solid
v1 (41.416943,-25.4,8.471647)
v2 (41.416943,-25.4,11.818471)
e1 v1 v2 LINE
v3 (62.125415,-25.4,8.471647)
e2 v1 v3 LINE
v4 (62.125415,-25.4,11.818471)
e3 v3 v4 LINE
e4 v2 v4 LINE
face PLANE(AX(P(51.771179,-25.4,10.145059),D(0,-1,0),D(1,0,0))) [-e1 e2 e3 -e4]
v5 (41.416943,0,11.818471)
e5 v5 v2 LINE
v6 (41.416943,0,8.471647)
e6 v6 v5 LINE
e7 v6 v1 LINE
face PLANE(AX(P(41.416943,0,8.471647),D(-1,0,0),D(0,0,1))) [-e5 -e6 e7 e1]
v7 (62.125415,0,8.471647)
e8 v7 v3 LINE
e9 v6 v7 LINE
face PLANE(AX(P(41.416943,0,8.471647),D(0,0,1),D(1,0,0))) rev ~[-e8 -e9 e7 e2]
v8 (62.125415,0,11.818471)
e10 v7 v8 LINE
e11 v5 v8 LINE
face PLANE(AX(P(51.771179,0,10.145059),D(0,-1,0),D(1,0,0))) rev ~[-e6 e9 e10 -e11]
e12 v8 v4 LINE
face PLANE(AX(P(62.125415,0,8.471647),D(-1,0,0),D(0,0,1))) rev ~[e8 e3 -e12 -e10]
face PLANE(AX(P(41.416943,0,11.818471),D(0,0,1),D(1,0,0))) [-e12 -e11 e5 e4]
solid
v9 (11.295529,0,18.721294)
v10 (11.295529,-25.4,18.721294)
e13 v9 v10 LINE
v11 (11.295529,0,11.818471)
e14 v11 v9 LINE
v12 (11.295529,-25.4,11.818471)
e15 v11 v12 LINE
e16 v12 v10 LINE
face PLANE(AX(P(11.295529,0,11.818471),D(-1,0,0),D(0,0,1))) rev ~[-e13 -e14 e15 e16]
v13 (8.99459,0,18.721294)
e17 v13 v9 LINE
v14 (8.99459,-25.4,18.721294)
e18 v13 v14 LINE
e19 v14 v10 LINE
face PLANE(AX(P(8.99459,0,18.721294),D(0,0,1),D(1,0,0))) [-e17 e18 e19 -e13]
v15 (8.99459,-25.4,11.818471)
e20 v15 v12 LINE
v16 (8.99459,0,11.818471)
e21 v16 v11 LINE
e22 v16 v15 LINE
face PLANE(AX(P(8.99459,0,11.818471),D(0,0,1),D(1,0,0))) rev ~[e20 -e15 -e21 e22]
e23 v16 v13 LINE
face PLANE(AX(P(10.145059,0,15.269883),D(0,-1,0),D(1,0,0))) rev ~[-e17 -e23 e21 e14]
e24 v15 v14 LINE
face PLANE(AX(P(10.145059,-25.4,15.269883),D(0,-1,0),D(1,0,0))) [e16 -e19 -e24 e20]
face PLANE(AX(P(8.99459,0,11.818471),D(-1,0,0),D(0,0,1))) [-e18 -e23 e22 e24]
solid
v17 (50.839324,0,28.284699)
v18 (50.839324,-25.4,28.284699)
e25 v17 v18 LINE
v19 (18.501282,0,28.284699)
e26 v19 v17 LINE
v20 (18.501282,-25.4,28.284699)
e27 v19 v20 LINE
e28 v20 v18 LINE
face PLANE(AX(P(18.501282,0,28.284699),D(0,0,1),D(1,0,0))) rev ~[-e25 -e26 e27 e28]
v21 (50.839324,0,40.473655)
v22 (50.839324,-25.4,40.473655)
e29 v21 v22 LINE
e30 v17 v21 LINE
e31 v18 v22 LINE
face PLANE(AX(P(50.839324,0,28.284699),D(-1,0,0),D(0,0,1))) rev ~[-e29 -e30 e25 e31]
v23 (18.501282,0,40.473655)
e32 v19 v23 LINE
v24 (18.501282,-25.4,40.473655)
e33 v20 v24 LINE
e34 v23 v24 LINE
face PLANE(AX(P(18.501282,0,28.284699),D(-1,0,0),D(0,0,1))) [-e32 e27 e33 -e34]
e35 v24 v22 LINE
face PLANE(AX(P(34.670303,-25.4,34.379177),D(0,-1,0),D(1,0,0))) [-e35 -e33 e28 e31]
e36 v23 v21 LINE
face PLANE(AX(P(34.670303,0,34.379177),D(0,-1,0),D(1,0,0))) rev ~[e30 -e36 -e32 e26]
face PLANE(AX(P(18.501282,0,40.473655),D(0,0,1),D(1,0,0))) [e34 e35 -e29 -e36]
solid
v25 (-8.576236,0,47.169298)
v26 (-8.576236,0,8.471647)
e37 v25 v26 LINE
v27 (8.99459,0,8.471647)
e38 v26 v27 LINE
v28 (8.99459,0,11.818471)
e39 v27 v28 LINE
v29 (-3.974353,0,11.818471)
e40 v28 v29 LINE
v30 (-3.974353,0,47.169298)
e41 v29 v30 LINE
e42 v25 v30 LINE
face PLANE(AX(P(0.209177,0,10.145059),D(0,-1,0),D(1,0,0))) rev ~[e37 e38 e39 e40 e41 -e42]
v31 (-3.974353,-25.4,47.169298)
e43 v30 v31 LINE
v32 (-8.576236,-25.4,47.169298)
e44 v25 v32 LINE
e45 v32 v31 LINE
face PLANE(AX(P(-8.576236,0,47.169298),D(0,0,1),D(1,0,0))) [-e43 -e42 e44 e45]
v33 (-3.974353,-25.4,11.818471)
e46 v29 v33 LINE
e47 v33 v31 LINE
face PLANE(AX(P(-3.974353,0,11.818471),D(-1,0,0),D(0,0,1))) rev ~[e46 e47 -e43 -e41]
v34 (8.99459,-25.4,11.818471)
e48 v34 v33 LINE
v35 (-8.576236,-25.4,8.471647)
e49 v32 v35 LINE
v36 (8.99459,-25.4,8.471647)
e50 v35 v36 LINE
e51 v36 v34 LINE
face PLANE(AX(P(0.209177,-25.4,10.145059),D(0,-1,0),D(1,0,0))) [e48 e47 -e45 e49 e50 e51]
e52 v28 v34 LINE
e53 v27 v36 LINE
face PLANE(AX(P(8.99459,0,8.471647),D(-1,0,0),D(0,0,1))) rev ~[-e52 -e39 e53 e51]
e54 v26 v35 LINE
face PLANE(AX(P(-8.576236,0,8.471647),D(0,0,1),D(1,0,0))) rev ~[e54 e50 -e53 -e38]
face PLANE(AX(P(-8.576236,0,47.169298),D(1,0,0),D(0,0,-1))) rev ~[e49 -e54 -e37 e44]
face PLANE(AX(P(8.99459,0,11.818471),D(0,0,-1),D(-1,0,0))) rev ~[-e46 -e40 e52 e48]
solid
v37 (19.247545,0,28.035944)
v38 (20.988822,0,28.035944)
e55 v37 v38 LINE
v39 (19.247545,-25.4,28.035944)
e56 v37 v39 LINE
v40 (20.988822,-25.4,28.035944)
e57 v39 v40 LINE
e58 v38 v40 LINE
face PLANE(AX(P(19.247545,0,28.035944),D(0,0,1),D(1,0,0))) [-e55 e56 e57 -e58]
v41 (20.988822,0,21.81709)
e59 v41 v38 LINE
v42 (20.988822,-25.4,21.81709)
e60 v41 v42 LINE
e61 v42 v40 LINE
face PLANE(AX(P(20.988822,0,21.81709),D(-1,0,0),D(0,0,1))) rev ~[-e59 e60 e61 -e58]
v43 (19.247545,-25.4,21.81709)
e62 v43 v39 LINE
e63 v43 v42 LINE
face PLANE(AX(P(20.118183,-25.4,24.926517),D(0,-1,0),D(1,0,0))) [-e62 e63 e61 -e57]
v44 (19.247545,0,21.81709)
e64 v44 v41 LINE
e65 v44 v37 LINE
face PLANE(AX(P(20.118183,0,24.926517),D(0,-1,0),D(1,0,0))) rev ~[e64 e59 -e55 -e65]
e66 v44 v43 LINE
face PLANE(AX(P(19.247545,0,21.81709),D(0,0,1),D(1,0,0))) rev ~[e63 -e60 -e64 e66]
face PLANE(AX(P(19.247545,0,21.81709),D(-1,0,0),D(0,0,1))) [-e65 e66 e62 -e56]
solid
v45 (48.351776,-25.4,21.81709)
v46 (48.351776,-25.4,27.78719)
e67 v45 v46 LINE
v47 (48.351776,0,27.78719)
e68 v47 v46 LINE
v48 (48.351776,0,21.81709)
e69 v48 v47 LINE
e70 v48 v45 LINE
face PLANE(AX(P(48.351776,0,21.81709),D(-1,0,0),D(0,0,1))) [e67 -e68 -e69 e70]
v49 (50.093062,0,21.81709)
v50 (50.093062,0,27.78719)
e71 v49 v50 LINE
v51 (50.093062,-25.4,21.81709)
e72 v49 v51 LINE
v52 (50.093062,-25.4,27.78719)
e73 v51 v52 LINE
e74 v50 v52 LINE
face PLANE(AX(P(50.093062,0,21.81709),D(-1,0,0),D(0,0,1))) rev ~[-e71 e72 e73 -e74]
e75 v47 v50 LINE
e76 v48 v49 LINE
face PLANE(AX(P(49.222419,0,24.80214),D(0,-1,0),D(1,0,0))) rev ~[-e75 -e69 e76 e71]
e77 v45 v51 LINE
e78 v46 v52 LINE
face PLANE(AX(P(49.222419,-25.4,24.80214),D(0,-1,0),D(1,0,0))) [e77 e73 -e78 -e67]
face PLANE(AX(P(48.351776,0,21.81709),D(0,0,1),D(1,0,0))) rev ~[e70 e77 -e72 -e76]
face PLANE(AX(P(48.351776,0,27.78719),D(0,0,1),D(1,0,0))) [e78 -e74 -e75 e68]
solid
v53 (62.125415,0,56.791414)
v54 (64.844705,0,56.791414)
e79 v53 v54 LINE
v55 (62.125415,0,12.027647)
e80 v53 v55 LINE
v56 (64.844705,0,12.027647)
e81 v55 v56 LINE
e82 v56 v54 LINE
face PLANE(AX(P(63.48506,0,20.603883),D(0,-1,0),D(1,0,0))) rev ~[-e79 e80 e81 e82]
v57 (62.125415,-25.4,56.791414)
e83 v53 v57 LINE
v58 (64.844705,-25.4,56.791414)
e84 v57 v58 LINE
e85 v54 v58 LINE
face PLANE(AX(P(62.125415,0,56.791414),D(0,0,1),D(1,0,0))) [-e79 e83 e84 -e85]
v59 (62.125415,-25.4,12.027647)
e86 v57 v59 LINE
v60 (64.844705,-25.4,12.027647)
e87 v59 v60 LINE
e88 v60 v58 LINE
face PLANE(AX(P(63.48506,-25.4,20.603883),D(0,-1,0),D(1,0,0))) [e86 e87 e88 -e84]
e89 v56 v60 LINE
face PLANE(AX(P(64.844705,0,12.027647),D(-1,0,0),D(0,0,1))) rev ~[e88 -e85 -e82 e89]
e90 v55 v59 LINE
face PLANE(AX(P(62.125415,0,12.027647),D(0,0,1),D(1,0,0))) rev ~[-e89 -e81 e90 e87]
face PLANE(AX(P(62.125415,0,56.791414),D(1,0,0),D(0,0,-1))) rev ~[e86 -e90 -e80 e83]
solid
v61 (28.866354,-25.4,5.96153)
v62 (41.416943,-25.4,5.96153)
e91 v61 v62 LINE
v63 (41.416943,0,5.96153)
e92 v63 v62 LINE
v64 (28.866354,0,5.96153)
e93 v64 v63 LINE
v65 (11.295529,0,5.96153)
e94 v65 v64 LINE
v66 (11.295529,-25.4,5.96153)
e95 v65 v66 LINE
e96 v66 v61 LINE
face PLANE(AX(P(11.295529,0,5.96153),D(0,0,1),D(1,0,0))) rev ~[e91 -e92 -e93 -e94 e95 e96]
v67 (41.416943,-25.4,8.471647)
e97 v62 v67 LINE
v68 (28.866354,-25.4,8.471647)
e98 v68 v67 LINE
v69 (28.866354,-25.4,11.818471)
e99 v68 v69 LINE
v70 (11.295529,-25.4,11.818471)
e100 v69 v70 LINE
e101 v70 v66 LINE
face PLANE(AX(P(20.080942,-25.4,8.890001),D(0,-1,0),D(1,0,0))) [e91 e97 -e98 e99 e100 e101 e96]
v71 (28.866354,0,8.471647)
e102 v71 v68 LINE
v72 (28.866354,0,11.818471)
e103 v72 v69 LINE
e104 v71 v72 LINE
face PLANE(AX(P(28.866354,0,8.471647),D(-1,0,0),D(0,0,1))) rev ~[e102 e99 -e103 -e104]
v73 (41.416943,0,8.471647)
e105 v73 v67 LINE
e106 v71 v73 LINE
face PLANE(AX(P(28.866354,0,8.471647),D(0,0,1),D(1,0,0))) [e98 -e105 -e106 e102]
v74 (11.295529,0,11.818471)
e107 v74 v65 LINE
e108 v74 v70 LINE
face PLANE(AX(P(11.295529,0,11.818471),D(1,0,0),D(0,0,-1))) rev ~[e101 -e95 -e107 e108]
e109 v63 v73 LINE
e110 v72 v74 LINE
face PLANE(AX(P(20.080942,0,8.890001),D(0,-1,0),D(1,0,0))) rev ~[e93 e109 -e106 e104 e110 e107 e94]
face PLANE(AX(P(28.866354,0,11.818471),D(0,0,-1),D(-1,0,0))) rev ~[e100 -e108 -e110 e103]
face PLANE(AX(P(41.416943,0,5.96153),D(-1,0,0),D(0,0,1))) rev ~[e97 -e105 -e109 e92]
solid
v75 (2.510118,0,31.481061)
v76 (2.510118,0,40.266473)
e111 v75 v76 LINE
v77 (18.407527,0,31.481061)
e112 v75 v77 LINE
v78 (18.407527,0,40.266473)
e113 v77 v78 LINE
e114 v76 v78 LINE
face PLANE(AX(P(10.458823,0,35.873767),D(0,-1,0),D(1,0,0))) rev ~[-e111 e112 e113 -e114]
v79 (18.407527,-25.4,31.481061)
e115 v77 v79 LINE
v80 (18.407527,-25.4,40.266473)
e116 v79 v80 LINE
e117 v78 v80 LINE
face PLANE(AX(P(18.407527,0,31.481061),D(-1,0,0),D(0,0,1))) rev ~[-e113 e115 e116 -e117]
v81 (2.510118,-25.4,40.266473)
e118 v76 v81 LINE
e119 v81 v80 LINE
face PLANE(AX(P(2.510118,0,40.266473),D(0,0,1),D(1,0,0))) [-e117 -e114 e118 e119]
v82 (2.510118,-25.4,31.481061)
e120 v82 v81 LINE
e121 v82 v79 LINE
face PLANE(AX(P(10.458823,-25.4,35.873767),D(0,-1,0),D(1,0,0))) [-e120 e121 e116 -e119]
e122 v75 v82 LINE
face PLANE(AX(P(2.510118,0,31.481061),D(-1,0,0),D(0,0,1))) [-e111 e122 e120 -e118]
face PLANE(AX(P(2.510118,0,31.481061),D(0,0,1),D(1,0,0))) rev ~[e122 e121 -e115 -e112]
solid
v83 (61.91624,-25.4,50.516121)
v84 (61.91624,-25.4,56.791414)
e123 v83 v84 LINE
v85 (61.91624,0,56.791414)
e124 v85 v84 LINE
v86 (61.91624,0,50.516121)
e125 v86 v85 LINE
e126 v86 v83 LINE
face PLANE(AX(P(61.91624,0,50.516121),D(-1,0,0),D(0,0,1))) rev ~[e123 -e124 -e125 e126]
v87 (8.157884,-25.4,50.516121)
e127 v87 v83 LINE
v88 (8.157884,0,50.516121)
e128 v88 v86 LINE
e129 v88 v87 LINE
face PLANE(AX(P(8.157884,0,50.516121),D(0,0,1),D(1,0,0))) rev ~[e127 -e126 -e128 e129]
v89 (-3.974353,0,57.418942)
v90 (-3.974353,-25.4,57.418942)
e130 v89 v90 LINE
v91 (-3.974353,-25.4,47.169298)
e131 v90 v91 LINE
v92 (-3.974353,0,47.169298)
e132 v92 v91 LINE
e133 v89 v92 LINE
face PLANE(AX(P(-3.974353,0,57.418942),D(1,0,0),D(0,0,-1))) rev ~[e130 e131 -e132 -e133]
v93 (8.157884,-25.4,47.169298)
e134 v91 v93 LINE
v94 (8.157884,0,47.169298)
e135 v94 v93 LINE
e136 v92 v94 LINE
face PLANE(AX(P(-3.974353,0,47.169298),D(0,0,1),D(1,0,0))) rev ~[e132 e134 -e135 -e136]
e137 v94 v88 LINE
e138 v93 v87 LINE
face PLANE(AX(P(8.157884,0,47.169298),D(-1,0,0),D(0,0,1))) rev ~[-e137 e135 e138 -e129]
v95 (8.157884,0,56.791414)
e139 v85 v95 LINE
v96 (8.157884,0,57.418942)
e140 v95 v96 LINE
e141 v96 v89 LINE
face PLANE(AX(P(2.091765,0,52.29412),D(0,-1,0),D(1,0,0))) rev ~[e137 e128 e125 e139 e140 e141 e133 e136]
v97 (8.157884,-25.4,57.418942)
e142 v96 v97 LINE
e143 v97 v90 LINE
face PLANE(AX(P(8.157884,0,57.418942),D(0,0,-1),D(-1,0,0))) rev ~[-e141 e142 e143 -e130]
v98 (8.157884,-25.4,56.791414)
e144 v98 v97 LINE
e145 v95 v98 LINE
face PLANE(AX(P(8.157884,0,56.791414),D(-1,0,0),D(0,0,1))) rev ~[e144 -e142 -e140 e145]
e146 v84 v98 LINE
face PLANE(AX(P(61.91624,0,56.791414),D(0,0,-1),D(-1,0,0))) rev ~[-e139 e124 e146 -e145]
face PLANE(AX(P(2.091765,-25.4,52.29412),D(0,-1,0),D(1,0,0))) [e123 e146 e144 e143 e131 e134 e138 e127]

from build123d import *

# Parameters (mm, degrees)
F0_W     = 32.3380418122
F0_H     = 12.1889561415
F2_DEPTH = 25.4
F1_W     = 1.741277054
F1_H     = 6.2188543379
F3_DEPTH = 25.4
F1_W_2   = 1.7412863672
F1_H_2   = 5.9700999409
F4_W     = 15.8974092919
F4_H     = 8.7854117155
F5_DEPTH = 25.4
F4_W_2   = 20.7084715366
F4_H_2   = 3.3468240872
F4_W_3   = 12.5505886972
F4_H_3   = 2.5101173669
F4_W_4   = 33.2590593025
F4_H_4   = 6.275292486
F4_W_5   = 1.2550577521
F4_W_6   = 19.2442387342
F4_W_7   = 4.601882305
F4_H_5   = 35.3508265689
F4_W_8   = 2.3009395227
F4_H_6   = 6.9028222933
F4_W_9   = 2.7192905545
F4_H_7   = 17.1524714679
F4_H_8   = 27.6112947613


# Not quite as in the source:
# - a feature names something its author has since deleted; it is built from what else it names


with BuildPart() as f2:
    # F0 (on Front) → F2 (new body)
    with BuildSketch(Plane.XZ):
        with Locations((34.6703026444, 34.3791767955)):
            Rectangle(F0_W, F0_H)
    extrude(amount=F2_DEPTH)


with BuildPart() as f3:
    # F1 (on Front) → F3 (new body)
    with BuildSketch(Plane.XZ):
        with Locations((20.1181834564, 24.9265171587)):
            Rectangle(F1_W, F1_H)
    extrude(amount=F3_DEPTH)


with BuildPart() as f3b:
    # F1 (on Front) → F3, piece 2 (new body)
    with BuildSketch(Plane.XZ):
        with Locations((49.2224190384, 24.8021399602)):
            Rectangle(F1_W_2, F1_H_2)
    extrude(amount=F3_DEPTH)


with BuildPart() as f5:
    # F4 (on Front) → F5 (new body)
    with BuildSketch(Plane.XZ):
        with Locations((10.4588227114, 35.8737669885)):
            Rectangle(F4_W, F4_H)
    extrude(amount=F5_DEPTH)


with BuildPart() as f5b:
    # F4 (on Front) → F5, piece 2 (new body)
    with BuildSketch(Plane.XZ):
        with Locations((51.7711788416, 10.1450593211)):
            Rectangle(F4_W_2, F4_H_2)
    extrude(amount=F5_DEPTH)


with BuildPart() as f5c:
    # F4 (on Front) → F5, piece 3 (new body)
    with BuildSketch(Plane.XZ):
        Polygon((28.8663543761, 11.8184713647), (11.2955290824, 11.8184713647), (11.2955290824, 5.9615299106), (28.8663543761, 5.9615299106), (28.8663543761, 8.4716472775), align=None)
        with Locations((35.1416487247, 7.216588594)):
            Rectangle(F4_W_3, F4_H_3)
    extrude(amount=F5_DEPTH)


with BuildPart() as f5d:
    # F4 (on Front) → F5, piece 4 (new body)
    with BuildSketch(Plane.XZ):
        Polygon((-3.9743534289, 57.4189424515), (-3.9743534289, 47.1692979336), (8.1578837708, 47.1692979336), (8.1578837708, 50.5161210895), (8.1578837708, 56.7914135754), (8.1578837708, 57.4189424515), align=None)
        with Locations((24.787413422, 53.6537673324)):
            Rectangle(F4_W_4, F4_H_4)
        with Locations((42.0444719493, 53.6537673324)):
            Rectangle(F4_W_5, F4_H_4)
        with Locations((52.2941201925, 53.6537673324)):
            Rectangle(F4_W_6, F4_H_4)
    extrude(amount=F5_DEPTH)


with BuildPart() as f5e:
    # F4 (on Front) → F5, piece 5 (new body)
    with BuildSketch(Plane.XZ):
        Polygon((8.9945895597, 8.4716472775), (8.9945895597, 11.8184713647), (-3.9743534289, 11.8184713647), (-8.5762357339, 11.8184713647), (-8.5762357339, 8.4716472775), align=None)
        with Locations((-6.2752945814, 29.4938846491)):
            Rectangle(F4_W_7, F4_H_5)
    extrude(amount=F5_DEPTH)


with BuildPart() as f5f:
    # F4 (on Front) → F5, piece 6 (new body)
    with BuildSketch(Plane.XZ):
        with Locations((10.1450593211, 15.2698825113)):
            Rectangle(F4_W_8, F4_H_6)
    extrude(amount=F5_DEPTH)


with BuildPart() as f5g:
    # F4 (on Front) → F5, piece 7 (new body)
    with BuildSketch(Plane.XZ):
        with Locations((63.4850598872, 20.6038830802)):
            Rectangle(F4_W_9, F4_H_7)
        with Locations((63.4850598872, 42.9857661948)):
            Rectangle(F4_W_9, F4_H_8)
    extrude(amount=F5_DEPTH)


solid = Compound([f2.part, f3.part, f3b.part, f5.part, f5b.part, f5c.part, f5d.part, f5e.part, f5f.part, f5g.part])
